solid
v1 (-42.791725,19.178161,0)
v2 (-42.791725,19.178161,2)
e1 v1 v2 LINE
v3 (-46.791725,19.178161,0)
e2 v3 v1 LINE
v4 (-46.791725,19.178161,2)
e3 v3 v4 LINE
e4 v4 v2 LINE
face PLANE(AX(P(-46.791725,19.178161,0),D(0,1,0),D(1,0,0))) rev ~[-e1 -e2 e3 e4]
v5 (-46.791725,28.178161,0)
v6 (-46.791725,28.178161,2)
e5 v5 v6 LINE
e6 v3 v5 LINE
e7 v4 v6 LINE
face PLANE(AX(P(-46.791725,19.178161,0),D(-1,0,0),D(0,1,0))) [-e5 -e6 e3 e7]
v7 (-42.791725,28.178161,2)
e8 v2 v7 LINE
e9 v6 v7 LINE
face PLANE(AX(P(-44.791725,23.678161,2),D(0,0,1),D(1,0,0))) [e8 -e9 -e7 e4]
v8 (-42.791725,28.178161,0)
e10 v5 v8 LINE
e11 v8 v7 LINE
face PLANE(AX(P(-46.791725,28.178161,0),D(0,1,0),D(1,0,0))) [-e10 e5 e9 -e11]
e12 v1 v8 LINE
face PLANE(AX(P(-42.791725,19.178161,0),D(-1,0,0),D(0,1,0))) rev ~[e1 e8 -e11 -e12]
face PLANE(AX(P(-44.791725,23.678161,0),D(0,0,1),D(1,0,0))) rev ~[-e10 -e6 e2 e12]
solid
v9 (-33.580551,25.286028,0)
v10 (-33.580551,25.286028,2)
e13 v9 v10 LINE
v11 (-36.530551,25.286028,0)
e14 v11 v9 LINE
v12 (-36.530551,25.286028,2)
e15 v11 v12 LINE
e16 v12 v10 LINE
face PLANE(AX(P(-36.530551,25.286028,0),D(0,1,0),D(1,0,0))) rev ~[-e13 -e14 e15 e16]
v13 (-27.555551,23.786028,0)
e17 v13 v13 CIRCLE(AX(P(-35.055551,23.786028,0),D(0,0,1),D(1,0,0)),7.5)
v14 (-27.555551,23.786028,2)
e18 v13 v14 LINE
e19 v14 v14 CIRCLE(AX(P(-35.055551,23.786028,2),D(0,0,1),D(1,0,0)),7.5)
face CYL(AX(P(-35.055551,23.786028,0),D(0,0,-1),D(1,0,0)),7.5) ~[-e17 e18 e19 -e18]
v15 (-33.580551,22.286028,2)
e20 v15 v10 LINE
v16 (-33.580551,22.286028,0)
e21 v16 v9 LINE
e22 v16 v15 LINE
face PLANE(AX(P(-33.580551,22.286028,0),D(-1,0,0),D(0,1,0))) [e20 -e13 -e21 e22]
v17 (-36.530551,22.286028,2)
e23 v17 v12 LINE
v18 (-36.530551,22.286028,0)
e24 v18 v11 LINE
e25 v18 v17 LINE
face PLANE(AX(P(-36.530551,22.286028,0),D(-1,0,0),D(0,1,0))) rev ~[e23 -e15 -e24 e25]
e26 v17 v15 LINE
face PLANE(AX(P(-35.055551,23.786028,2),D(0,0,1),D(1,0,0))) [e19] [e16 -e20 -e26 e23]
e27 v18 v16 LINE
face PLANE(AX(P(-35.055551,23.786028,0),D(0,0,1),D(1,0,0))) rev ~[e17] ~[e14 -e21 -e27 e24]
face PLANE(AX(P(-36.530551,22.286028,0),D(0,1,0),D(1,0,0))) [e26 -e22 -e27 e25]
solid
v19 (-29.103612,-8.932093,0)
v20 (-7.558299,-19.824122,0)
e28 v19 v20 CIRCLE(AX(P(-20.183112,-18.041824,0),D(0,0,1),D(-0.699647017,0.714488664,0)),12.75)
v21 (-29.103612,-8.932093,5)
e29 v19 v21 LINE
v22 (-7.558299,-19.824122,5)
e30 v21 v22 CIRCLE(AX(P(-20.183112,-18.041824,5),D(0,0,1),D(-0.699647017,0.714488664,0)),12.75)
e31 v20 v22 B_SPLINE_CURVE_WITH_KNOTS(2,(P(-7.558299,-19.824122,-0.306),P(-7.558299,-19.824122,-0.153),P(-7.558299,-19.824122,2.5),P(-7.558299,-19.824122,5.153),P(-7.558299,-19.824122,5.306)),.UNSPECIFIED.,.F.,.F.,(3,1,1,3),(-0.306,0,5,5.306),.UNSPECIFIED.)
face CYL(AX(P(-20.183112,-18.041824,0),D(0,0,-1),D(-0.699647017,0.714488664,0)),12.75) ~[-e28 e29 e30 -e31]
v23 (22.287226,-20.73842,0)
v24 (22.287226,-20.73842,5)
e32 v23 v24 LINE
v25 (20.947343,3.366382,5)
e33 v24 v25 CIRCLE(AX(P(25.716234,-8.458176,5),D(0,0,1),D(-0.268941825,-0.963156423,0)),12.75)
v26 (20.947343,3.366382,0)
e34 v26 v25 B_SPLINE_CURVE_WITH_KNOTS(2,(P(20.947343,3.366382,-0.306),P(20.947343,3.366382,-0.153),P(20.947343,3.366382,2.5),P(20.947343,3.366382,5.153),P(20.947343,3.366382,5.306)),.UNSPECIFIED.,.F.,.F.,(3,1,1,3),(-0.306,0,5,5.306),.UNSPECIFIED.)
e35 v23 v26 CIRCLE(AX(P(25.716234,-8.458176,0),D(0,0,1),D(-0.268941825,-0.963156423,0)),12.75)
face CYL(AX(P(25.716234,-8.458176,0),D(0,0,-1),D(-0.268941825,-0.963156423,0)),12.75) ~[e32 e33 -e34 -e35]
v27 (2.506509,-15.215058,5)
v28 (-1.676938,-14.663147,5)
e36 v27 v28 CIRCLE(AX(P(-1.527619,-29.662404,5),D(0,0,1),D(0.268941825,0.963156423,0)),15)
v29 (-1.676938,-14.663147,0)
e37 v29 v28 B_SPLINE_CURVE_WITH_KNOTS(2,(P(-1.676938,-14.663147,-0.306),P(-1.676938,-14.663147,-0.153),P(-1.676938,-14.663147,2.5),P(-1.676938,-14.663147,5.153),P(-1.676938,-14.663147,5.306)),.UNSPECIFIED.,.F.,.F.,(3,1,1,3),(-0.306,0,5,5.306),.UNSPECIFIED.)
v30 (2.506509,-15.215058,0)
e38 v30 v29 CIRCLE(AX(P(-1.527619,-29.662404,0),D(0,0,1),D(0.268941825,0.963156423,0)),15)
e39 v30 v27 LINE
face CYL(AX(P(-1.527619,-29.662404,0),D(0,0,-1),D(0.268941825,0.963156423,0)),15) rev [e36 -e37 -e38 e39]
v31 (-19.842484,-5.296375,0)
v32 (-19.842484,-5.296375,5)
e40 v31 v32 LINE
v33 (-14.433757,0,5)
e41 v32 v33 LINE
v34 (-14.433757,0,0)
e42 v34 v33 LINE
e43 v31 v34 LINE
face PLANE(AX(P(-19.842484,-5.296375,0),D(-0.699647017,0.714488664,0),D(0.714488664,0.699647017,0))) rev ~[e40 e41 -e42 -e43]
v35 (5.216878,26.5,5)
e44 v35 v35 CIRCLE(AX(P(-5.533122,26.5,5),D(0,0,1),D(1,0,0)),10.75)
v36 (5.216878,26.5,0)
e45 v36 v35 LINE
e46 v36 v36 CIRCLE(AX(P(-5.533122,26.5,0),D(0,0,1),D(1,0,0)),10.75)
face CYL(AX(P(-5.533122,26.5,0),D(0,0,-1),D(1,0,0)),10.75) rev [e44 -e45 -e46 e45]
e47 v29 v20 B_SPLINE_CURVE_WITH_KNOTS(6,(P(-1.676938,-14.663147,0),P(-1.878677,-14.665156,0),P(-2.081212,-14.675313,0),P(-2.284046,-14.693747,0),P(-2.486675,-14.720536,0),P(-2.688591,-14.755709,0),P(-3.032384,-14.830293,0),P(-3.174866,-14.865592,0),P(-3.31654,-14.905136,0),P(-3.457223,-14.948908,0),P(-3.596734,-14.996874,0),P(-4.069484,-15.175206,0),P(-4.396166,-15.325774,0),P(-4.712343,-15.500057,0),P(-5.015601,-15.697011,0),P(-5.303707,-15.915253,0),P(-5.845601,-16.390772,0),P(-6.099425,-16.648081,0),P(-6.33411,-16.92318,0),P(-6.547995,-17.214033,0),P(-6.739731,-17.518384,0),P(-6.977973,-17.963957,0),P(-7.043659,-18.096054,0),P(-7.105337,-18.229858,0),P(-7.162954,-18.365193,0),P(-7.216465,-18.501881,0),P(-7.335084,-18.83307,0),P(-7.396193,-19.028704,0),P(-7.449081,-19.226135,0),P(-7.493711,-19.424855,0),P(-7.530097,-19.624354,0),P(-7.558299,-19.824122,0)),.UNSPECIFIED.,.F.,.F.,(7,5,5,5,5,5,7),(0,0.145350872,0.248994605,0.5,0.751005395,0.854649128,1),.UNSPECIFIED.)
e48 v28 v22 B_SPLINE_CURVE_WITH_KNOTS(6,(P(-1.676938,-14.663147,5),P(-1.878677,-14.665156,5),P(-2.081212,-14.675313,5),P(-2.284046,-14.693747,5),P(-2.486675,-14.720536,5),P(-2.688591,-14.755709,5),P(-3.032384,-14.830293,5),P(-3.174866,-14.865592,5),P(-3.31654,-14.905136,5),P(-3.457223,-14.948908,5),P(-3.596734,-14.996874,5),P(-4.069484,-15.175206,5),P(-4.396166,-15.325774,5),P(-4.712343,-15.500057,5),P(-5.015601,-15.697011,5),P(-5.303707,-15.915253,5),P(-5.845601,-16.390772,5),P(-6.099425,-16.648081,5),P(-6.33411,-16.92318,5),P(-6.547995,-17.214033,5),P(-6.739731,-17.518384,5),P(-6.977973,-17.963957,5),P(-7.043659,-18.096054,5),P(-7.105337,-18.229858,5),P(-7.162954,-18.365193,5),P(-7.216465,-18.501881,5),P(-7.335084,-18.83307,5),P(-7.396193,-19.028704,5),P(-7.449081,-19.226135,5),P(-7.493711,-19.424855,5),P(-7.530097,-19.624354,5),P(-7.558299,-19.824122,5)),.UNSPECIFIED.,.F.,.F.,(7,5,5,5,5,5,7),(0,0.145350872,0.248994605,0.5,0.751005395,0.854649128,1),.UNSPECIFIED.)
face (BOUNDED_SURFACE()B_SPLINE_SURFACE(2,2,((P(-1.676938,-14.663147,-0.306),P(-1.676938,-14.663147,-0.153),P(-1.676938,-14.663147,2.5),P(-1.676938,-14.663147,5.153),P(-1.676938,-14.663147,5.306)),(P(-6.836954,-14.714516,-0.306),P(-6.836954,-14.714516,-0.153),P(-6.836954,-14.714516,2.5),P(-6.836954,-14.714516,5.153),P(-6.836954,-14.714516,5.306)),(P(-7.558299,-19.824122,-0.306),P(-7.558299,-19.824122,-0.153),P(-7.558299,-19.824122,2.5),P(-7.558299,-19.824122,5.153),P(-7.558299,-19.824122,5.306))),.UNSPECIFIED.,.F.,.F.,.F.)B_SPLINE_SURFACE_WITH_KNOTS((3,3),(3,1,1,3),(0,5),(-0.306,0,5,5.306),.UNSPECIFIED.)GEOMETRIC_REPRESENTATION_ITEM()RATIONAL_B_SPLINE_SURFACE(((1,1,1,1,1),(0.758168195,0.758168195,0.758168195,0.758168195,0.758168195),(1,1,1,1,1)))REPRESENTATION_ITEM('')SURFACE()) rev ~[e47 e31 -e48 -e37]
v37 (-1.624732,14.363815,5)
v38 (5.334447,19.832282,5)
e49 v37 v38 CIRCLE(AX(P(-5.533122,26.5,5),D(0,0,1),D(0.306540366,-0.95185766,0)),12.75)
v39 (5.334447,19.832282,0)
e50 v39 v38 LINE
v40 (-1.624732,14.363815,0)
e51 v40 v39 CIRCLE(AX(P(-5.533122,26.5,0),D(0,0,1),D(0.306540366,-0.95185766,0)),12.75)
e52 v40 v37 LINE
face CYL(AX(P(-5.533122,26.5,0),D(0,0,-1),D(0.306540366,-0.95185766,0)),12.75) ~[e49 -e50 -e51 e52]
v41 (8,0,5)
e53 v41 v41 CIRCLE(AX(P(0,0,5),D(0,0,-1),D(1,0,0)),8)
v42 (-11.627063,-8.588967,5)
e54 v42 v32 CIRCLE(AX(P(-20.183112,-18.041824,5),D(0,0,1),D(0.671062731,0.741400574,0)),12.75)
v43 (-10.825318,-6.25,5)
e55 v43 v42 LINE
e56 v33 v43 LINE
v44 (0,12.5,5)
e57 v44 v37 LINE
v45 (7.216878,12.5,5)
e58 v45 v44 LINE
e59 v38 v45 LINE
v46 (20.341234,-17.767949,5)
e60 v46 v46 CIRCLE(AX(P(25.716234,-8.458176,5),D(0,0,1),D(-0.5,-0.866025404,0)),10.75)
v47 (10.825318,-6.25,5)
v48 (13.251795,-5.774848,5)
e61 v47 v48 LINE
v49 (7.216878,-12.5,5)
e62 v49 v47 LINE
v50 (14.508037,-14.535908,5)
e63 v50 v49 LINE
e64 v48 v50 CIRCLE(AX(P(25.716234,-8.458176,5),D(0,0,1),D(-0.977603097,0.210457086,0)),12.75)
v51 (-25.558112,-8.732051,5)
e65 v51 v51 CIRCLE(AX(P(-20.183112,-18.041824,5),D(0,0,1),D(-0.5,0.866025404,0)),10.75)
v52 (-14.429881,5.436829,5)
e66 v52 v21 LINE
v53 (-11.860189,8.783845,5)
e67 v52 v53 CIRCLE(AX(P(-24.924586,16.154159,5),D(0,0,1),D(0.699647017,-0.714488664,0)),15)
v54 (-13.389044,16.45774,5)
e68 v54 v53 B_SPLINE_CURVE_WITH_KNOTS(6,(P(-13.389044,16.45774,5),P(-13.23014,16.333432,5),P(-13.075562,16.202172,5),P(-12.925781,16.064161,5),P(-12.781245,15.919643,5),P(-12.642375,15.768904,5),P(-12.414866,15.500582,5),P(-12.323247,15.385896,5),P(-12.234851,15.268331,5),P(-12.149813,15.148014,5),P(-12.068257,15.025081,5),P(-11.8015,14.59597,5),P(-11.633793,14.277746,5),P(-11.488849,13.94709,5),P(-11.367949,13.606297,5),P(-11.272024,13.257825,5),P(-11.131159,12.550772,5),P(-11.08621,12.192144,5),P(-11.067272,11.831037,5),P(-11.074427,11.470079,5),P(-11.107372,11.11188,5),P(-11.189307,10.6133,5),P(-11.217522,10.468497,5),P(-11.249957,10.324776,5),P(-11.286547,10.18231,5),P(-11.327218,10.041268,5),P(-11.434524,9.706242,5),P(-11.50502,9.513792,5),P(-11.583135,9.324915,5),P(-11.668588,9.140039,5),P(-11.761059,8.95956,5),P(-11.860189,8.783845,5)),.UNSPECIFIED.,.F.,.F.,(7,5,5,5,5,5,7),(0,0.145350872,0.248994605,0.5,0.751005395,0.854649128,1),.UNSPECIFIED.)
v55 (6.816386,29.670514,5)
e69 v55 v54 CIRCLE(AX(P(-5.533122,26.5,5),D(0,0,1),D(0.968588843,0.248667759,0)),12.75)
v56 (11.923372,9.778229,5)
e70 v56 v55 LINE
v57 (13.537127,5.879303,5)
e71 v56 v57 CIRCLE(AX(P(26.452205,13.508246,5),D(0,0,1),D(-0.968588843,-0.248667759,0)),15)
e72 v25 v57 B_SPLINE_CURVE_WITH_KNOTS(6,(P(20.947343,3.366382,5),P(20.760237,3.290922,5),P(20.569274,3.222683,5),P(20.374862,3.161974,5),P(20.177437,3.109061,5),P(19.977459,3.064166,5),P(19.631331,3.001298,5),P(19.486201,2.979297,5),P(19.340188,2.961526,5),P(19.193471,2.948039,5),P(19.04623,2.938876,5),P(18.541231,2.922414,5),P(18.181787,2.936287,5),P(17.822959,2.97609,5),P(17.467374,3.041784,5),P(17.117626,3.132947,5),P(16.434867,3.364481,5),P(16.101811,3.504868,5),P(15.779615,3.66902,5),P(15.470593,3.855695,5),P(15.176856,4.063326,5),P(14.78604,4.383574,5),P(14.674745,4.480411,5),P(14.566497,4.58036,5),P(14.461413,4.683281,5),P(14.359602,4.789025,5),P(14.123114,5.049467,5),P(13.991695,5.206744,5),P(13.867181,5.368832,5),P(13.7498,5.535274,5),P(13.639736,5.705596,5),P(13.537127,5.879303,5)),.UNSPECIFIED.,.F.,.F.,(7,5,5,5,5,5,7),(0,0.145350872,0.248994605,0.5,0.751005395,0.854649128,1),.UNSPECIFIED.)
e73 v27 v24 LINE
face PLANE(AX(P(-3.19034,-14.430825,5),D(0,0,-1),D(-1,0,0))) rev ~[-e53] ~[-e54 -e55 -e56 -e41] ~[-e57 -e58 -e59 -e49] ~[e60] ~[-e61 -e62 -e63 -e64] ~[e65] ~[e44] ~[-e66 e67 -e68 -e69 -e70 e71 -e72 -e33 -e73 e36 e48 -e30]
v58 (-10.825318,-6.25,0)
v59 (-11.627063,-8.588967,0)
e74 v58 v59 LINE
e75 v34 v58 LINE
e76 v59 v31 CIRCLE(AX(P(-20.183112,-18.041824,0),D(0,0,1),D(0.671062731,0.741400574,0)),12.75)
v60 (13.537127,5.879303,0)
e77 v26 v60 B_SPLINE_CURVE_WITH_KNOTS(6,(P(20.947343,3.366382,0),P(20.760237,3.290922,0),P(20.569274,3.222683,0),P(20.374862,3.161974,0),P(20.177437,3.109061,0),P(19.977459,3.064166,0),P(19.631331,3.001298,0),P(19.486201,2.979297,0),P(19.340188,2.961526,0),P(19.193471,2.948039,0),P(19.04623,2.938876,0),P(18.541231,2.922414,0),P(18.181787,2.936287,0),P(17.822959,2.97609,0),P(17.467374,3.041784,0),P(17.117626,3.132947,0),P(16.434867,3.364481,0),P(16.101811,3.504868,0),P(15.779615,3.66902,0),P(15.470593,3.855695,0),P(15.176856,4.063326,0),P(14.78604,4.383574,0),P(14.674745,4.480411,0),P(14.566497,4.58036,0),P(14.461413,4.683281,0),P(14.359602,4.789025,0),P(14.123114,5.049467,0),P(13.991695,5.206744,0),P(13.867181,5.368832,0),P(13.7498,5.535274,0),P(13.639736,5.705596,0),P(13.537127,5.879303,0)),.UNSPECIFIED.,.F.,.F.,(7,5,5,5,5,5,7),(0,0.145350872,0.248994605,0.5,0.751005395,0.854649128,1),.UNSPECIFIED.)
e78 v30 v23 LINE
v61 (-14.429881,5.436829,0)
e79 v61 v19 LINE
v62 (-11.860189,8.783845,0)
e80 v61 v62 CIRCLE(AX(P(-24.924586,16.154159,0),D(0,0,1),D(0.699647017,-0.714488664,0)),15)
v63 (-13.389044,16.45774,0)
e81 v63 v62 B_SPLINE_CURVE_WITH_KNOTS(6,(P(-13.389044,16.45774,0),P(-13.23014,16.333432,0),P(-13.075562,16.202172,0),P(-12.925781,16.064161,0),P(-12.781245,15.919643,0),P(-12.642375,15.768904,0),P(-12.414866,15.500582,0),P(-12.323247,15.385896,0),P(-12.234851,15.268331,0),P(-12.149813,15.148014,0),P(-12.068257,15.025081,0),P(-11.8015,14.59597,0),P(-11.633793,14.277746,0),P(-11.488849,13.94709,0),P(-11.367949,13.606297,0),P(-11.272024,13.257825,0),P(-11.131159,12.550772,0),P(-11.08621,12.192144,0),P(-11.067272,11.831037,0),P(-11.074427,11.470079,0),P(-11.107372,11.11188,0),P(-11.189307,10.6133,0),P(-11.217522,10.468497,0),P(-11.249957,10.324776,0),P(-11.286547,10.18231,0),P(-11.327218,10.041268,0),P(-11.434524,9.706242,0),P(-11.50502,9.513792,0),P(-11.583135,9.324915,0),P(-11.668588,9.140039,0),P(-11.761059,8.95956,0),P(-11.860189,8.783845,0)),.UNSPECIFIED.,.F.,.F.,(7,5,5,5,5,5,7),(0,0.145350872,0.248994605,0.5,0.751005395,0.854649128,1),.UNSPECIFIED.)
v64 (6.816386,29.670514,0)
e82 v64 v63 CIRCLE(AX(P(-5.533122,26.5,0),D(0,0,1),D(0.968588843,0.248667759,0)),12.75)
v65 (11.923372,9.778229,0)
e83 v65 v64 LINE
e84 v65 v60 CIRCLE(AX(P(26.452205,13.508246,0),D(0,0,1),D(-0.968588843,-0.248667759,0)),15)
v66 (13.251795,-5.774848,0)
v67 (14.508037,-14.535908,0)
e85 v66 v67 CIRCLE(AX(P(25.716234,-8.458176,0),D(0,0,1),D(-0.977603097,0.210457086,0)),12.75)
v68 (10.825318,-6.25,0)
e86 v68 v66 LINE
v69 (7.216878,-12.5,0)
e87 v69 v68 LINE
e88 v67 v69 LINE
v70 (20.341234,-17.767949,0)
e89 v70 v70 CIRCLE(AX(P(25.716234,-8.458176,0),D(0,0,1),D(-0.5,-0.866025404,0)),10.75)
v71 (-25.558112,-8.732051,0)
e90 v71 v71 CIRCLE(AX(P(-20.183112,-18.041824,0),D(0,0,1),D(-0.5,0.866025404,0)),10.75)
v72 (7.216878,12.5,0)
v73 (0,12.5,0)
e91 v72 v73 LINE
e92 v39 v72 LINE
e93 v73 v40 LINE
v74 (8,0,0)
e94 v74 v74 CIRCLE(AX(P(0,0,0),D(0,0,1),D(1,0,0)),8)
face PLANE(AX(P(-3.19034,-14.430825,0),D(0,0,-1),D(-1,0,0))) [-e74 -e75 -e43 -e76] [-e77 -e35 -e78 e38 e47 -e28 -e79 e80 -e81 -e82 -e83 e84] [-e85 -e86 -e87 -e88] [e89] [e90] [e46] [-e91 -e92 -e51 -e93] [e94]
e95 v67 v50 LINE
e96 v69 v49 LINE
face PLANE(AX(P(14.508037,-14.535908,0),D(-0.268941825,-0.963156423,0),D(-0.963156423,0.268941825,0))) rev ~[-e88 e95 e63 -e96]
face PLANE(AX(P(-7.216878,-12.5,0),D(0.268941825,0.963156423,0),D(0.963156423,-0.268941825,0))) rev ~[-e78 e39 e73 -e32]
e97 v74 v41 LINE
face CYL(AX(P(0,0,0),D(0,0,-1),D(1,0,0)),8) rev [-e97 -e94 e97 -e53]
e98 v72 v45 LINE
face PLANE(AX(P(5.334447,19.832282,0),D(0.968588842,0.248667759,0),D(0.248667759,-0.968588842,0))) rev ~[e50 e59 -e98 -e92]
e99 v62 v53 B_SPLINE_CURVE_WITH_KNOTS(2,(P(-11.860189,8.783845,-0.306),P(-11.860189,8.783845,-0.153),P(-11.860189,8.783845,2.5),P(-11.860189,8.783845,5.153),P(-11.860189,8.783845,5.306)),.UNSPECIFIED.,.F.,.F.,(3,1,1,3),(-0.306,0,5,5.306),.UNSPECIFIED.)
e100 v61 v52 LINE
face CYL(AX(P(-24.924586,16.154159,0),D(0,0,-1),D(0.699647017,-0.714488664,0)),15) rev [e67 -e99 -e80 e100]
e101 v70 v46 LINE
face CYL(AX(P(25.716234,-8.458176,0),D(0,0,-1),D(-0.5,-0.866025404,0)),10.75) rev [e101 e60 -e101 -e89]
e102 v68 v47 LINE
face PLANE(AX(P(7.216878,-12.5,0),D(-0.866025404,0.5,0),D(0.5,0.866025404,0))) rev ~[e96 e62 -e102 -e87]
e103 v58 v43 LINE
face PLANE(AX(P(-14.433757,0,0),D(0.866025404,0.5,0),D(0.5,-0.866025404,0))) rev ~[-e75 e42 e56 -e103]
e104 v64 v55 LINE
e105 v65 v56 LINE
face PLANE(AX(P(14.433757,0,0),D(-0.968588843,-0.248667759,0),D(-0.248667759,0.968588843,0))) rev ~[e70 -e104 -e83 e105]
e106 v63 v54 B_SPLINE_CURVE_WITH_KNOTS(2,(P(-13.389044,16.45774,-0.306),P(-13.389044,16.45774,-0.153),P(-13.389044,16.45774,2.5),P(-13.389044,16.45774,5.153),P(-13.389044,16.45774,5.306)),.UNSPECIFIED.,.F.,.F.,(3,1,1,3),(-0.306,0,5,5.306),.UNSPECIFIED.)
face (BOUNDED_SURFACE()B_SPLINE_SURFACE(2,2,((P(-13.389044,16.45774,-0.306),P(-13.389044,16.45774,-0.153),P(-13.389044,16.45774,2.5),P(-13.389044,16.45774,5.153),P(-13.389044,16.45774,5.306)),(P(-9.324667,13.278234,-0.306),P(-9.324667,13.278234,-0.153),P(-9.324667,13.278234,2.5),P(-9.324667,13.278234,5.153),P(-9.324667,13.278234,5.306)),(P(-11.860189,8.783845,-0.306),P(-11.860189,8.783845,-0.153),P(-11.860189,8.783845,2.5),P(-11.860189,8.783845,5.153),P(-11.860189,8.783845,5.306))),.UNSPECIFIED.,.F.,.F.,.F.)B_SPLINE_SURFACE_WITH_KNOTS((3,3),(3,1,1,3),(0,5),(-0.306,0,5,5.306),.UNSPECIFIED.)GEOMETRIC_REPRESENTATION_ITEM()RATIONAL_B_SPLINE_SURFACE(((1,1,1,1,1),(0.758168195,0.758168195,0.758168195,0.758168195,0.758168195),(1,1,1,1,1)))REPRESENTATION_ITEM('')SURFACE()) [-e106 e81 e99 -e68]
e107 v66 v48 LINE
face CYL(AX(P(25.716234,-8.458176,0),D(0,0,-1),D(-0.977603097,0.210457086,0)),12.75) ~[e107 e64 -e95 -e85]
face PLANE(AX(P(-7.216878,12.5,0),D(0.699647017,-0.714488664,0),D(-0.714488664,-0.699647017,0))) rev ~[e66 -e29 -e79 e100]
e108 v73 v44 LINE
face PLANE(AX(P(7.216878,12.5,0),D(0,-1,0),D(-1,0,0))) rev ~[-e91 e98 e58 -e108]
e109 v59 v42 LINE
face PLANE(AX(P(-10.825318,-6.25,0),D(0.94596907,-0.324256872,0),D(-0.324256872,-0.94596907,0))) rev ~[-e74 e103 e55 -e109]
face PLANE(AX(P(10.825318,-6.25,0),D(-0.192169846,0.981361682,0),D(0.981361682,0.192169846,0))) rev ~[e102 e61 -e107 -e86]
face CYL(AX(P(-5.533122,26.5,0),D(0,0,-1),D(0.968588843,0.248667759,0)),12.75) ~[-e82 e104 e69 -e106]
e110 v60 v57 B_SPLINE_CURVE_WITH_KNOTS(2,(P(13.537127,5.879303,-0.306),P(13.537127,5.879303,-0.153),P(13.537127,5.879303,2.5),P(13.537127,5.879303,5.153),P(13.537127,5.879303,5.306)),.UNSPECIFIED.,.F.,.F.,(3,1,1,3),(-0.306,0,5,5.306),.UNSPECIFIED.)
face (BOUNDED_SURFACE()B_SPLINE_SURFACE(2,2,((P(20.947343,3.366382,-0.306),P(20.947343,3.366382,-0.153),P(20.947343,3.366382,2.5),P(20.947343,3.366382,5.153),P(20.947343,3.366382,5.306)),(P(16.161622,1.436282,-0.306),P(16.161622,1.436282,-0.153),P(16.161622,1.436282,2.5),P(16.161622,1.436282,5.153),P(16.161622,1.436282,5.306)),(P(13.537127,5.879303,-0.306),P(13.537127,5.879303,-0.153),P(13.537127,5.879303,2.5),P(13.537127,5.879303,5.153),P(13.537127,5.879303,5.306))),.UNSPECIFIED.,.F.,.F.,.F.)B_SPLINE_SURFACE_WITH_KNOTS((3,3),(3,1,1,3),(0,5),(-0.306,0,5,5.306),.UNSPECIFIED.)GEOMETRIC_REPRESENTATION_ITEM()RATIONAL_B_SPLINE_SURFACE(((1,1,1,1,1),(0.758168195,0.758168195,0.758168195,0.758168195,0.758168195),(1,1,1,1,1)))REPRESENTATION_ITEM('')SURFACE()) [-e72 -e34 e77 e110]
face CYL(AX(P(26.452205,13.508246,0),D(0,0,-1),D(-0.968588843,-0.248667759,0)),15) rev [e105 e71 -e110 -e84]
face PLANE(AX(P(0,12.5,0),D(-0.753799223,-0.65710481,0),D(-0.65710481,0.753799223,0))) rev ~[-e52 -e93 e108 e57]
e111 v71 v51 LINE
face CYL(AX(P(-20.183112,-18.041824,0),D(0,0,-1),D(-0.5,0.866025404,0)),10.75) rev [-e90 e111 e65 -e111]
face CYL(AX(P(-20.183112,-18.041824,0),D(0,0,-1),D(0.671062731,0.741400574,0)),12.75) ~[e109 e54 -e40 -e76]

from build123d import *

# Parameters (mm, degrees)
F0_R        = 8
F1_DEPTH    = 5
F0_R_2      = 10.75
F2_DEPTH    = 5
F3_COUNT    = 3
F4_T1_DEPTH = 5
F5_W        = 4
F5_H        = 9
F6_DEPTH    = 2
F5_R        = 7.5
F5_W_2      = 2.95
F5_H_2      = 3
F7_R        = 6


# Not quite as in the source:
# - a fillet or chamfer that OpenCascade refuses, or shapes differently, is made with other operations: its cross-section is extruded or revolved along the edge and cut away or added
# - a feature names something its author has since deleted; it is built from what else it names


with BuildPart() as f1:
    # F0 (on Top) → F1 (new body)
    with BuildSketch(Plane.XY):
        Polygon((0, 12.5), (-7.2168783649, 12.5), (-14.4337567297, 0), (-7.2168783649, -12.5), (7.2168783649, -12.5), (14.4337567297, 0), (7.2168783649, 12.5), align=None)
        Circle(F0_R, mode=Mode.SUBTRACT)
    extrude(amount=F1_DEPTH)

    # F0 (on Top) → F2 (join)
    with BuildSketch(Plane.XY):
        with BuildLine():
            Line((-10.0093687347, 14.5615867092), (-7.2168783649, 12.5))
            Line((-7.2168783649, 12.5), (0, 12.5))
            Line((0, 12.5), (-1.6247319688, 14.3638148409))
            ThreePointArc((-1.6247319688, 14.3638148409), (2.3445854374, 16.4748201373), (5.3344467629, 19.8322824659))
            Line((5.3344467629, 19.8322824659), (7.2168783649, 12.5))
            Line((7.2168783649, 12.5), (14.4337567297, 0))
            Line((14.4337567297, 0), (6.8163861068, 29.6705139226))
            ThreePointArc((6.8163861068, 29.6705139226), (-14.0517470331, 35.9865969309), (-10.0093687347, 14.5615867092))
        make_face()
        with Locations((-5.5331216351, 26.5)):
            Circle(F0_R_2, mode=Mode.SUBTRACT)
    extrude(amount=F2_DEPTH)

    # F3: F1 ×3 about axis
    f3_axis = Axis((0, 0, 0), (0, 0, 1))


with BuildPart() as f1_1:
    add(f1.part)
    for i in range(1, F3_COUNT):
        add(f1.part.rotate(f3_axis, i * 360 / F3_COUNT))

    # F4: fillet of radius 15 on 3 edges, made by hand

    # F4_s2 → F4_t1 (join)
    with BuildSketch(Plane.XY):
        with BuildLine():
            ThreePointArc((2.5065087004, -15.21505791), (-2.6136621593, -14.7017722607), (-7.6060196422, -15.9491609547))
            Line((-7.6060196422, -15.9491609547), (-7.2168783649, -12.5))
            Line((-7.2168783649, -12.5), (2.5065087004, -15.21505791))
        make_face()
        with BuildLine():
            ThreePointArc((-14.4298810204, 5.4368287457), (-11.4252771788, 9.6143839572), (-10.0093687348, 14.5615867092))
            Line((-10.0093687348, 14.5615867092), (-7.2168783649, 12.5))
            Line((-7.2168783649, 12.5), (-14.4298810204, 5.4368287457))
        make_face()
        with BuildLine():
            ThreePointArc((11.92337232, 9.7782291644), (14.0389393381, 5.0873883035), (17.6153883769, 1.3875742456))
            Line((17.6153883769, 1.3875742456), (14.4337567297, 0))
            Line((14.4337567297, 0), (11.92337232, 9.7782291644))
        make_face()
    extrude(amount=F4_T1_DEPTH)

    # F7
    f7_edges = [f1_1.edges().sort_by_distance(p)[0] for p in [
        (-10.009369, 14.561587, 2.5),
        (17.615388, 1.387574, 2.5),
        (-7.60602, -15.949161, 2.5),
    ]]
    fillet(f7_edges, radius=F7_R)


with BuildPart() as f6:
    # F5 (on Top) → F6 (new body)
    with BuildSketch(Plane.XY):
        with Locations((-44.7917245328, 23.6781613976)):
            Rectangle(F5_W, F5_H)
    extrude(amount=F6_DEPTH)


with BuildPart() as f6b:
    # F5 (on Top) → F6, piece 2 (new body)
    with BuildSketch(Plane.XY):
        with Locations((-35.0555505693, 23.7860276699)):
            Circle(F5_R)
        with Locations((-35.0555505693, 23.7860276699)):
            Rectangle(F5_W_2, F5_H_2, mode=Mode.SUBTRACT)
    extrude(amount=F6_DEPTH)


solid = Compound([f1_1.part, f6.part, f6b.part])
